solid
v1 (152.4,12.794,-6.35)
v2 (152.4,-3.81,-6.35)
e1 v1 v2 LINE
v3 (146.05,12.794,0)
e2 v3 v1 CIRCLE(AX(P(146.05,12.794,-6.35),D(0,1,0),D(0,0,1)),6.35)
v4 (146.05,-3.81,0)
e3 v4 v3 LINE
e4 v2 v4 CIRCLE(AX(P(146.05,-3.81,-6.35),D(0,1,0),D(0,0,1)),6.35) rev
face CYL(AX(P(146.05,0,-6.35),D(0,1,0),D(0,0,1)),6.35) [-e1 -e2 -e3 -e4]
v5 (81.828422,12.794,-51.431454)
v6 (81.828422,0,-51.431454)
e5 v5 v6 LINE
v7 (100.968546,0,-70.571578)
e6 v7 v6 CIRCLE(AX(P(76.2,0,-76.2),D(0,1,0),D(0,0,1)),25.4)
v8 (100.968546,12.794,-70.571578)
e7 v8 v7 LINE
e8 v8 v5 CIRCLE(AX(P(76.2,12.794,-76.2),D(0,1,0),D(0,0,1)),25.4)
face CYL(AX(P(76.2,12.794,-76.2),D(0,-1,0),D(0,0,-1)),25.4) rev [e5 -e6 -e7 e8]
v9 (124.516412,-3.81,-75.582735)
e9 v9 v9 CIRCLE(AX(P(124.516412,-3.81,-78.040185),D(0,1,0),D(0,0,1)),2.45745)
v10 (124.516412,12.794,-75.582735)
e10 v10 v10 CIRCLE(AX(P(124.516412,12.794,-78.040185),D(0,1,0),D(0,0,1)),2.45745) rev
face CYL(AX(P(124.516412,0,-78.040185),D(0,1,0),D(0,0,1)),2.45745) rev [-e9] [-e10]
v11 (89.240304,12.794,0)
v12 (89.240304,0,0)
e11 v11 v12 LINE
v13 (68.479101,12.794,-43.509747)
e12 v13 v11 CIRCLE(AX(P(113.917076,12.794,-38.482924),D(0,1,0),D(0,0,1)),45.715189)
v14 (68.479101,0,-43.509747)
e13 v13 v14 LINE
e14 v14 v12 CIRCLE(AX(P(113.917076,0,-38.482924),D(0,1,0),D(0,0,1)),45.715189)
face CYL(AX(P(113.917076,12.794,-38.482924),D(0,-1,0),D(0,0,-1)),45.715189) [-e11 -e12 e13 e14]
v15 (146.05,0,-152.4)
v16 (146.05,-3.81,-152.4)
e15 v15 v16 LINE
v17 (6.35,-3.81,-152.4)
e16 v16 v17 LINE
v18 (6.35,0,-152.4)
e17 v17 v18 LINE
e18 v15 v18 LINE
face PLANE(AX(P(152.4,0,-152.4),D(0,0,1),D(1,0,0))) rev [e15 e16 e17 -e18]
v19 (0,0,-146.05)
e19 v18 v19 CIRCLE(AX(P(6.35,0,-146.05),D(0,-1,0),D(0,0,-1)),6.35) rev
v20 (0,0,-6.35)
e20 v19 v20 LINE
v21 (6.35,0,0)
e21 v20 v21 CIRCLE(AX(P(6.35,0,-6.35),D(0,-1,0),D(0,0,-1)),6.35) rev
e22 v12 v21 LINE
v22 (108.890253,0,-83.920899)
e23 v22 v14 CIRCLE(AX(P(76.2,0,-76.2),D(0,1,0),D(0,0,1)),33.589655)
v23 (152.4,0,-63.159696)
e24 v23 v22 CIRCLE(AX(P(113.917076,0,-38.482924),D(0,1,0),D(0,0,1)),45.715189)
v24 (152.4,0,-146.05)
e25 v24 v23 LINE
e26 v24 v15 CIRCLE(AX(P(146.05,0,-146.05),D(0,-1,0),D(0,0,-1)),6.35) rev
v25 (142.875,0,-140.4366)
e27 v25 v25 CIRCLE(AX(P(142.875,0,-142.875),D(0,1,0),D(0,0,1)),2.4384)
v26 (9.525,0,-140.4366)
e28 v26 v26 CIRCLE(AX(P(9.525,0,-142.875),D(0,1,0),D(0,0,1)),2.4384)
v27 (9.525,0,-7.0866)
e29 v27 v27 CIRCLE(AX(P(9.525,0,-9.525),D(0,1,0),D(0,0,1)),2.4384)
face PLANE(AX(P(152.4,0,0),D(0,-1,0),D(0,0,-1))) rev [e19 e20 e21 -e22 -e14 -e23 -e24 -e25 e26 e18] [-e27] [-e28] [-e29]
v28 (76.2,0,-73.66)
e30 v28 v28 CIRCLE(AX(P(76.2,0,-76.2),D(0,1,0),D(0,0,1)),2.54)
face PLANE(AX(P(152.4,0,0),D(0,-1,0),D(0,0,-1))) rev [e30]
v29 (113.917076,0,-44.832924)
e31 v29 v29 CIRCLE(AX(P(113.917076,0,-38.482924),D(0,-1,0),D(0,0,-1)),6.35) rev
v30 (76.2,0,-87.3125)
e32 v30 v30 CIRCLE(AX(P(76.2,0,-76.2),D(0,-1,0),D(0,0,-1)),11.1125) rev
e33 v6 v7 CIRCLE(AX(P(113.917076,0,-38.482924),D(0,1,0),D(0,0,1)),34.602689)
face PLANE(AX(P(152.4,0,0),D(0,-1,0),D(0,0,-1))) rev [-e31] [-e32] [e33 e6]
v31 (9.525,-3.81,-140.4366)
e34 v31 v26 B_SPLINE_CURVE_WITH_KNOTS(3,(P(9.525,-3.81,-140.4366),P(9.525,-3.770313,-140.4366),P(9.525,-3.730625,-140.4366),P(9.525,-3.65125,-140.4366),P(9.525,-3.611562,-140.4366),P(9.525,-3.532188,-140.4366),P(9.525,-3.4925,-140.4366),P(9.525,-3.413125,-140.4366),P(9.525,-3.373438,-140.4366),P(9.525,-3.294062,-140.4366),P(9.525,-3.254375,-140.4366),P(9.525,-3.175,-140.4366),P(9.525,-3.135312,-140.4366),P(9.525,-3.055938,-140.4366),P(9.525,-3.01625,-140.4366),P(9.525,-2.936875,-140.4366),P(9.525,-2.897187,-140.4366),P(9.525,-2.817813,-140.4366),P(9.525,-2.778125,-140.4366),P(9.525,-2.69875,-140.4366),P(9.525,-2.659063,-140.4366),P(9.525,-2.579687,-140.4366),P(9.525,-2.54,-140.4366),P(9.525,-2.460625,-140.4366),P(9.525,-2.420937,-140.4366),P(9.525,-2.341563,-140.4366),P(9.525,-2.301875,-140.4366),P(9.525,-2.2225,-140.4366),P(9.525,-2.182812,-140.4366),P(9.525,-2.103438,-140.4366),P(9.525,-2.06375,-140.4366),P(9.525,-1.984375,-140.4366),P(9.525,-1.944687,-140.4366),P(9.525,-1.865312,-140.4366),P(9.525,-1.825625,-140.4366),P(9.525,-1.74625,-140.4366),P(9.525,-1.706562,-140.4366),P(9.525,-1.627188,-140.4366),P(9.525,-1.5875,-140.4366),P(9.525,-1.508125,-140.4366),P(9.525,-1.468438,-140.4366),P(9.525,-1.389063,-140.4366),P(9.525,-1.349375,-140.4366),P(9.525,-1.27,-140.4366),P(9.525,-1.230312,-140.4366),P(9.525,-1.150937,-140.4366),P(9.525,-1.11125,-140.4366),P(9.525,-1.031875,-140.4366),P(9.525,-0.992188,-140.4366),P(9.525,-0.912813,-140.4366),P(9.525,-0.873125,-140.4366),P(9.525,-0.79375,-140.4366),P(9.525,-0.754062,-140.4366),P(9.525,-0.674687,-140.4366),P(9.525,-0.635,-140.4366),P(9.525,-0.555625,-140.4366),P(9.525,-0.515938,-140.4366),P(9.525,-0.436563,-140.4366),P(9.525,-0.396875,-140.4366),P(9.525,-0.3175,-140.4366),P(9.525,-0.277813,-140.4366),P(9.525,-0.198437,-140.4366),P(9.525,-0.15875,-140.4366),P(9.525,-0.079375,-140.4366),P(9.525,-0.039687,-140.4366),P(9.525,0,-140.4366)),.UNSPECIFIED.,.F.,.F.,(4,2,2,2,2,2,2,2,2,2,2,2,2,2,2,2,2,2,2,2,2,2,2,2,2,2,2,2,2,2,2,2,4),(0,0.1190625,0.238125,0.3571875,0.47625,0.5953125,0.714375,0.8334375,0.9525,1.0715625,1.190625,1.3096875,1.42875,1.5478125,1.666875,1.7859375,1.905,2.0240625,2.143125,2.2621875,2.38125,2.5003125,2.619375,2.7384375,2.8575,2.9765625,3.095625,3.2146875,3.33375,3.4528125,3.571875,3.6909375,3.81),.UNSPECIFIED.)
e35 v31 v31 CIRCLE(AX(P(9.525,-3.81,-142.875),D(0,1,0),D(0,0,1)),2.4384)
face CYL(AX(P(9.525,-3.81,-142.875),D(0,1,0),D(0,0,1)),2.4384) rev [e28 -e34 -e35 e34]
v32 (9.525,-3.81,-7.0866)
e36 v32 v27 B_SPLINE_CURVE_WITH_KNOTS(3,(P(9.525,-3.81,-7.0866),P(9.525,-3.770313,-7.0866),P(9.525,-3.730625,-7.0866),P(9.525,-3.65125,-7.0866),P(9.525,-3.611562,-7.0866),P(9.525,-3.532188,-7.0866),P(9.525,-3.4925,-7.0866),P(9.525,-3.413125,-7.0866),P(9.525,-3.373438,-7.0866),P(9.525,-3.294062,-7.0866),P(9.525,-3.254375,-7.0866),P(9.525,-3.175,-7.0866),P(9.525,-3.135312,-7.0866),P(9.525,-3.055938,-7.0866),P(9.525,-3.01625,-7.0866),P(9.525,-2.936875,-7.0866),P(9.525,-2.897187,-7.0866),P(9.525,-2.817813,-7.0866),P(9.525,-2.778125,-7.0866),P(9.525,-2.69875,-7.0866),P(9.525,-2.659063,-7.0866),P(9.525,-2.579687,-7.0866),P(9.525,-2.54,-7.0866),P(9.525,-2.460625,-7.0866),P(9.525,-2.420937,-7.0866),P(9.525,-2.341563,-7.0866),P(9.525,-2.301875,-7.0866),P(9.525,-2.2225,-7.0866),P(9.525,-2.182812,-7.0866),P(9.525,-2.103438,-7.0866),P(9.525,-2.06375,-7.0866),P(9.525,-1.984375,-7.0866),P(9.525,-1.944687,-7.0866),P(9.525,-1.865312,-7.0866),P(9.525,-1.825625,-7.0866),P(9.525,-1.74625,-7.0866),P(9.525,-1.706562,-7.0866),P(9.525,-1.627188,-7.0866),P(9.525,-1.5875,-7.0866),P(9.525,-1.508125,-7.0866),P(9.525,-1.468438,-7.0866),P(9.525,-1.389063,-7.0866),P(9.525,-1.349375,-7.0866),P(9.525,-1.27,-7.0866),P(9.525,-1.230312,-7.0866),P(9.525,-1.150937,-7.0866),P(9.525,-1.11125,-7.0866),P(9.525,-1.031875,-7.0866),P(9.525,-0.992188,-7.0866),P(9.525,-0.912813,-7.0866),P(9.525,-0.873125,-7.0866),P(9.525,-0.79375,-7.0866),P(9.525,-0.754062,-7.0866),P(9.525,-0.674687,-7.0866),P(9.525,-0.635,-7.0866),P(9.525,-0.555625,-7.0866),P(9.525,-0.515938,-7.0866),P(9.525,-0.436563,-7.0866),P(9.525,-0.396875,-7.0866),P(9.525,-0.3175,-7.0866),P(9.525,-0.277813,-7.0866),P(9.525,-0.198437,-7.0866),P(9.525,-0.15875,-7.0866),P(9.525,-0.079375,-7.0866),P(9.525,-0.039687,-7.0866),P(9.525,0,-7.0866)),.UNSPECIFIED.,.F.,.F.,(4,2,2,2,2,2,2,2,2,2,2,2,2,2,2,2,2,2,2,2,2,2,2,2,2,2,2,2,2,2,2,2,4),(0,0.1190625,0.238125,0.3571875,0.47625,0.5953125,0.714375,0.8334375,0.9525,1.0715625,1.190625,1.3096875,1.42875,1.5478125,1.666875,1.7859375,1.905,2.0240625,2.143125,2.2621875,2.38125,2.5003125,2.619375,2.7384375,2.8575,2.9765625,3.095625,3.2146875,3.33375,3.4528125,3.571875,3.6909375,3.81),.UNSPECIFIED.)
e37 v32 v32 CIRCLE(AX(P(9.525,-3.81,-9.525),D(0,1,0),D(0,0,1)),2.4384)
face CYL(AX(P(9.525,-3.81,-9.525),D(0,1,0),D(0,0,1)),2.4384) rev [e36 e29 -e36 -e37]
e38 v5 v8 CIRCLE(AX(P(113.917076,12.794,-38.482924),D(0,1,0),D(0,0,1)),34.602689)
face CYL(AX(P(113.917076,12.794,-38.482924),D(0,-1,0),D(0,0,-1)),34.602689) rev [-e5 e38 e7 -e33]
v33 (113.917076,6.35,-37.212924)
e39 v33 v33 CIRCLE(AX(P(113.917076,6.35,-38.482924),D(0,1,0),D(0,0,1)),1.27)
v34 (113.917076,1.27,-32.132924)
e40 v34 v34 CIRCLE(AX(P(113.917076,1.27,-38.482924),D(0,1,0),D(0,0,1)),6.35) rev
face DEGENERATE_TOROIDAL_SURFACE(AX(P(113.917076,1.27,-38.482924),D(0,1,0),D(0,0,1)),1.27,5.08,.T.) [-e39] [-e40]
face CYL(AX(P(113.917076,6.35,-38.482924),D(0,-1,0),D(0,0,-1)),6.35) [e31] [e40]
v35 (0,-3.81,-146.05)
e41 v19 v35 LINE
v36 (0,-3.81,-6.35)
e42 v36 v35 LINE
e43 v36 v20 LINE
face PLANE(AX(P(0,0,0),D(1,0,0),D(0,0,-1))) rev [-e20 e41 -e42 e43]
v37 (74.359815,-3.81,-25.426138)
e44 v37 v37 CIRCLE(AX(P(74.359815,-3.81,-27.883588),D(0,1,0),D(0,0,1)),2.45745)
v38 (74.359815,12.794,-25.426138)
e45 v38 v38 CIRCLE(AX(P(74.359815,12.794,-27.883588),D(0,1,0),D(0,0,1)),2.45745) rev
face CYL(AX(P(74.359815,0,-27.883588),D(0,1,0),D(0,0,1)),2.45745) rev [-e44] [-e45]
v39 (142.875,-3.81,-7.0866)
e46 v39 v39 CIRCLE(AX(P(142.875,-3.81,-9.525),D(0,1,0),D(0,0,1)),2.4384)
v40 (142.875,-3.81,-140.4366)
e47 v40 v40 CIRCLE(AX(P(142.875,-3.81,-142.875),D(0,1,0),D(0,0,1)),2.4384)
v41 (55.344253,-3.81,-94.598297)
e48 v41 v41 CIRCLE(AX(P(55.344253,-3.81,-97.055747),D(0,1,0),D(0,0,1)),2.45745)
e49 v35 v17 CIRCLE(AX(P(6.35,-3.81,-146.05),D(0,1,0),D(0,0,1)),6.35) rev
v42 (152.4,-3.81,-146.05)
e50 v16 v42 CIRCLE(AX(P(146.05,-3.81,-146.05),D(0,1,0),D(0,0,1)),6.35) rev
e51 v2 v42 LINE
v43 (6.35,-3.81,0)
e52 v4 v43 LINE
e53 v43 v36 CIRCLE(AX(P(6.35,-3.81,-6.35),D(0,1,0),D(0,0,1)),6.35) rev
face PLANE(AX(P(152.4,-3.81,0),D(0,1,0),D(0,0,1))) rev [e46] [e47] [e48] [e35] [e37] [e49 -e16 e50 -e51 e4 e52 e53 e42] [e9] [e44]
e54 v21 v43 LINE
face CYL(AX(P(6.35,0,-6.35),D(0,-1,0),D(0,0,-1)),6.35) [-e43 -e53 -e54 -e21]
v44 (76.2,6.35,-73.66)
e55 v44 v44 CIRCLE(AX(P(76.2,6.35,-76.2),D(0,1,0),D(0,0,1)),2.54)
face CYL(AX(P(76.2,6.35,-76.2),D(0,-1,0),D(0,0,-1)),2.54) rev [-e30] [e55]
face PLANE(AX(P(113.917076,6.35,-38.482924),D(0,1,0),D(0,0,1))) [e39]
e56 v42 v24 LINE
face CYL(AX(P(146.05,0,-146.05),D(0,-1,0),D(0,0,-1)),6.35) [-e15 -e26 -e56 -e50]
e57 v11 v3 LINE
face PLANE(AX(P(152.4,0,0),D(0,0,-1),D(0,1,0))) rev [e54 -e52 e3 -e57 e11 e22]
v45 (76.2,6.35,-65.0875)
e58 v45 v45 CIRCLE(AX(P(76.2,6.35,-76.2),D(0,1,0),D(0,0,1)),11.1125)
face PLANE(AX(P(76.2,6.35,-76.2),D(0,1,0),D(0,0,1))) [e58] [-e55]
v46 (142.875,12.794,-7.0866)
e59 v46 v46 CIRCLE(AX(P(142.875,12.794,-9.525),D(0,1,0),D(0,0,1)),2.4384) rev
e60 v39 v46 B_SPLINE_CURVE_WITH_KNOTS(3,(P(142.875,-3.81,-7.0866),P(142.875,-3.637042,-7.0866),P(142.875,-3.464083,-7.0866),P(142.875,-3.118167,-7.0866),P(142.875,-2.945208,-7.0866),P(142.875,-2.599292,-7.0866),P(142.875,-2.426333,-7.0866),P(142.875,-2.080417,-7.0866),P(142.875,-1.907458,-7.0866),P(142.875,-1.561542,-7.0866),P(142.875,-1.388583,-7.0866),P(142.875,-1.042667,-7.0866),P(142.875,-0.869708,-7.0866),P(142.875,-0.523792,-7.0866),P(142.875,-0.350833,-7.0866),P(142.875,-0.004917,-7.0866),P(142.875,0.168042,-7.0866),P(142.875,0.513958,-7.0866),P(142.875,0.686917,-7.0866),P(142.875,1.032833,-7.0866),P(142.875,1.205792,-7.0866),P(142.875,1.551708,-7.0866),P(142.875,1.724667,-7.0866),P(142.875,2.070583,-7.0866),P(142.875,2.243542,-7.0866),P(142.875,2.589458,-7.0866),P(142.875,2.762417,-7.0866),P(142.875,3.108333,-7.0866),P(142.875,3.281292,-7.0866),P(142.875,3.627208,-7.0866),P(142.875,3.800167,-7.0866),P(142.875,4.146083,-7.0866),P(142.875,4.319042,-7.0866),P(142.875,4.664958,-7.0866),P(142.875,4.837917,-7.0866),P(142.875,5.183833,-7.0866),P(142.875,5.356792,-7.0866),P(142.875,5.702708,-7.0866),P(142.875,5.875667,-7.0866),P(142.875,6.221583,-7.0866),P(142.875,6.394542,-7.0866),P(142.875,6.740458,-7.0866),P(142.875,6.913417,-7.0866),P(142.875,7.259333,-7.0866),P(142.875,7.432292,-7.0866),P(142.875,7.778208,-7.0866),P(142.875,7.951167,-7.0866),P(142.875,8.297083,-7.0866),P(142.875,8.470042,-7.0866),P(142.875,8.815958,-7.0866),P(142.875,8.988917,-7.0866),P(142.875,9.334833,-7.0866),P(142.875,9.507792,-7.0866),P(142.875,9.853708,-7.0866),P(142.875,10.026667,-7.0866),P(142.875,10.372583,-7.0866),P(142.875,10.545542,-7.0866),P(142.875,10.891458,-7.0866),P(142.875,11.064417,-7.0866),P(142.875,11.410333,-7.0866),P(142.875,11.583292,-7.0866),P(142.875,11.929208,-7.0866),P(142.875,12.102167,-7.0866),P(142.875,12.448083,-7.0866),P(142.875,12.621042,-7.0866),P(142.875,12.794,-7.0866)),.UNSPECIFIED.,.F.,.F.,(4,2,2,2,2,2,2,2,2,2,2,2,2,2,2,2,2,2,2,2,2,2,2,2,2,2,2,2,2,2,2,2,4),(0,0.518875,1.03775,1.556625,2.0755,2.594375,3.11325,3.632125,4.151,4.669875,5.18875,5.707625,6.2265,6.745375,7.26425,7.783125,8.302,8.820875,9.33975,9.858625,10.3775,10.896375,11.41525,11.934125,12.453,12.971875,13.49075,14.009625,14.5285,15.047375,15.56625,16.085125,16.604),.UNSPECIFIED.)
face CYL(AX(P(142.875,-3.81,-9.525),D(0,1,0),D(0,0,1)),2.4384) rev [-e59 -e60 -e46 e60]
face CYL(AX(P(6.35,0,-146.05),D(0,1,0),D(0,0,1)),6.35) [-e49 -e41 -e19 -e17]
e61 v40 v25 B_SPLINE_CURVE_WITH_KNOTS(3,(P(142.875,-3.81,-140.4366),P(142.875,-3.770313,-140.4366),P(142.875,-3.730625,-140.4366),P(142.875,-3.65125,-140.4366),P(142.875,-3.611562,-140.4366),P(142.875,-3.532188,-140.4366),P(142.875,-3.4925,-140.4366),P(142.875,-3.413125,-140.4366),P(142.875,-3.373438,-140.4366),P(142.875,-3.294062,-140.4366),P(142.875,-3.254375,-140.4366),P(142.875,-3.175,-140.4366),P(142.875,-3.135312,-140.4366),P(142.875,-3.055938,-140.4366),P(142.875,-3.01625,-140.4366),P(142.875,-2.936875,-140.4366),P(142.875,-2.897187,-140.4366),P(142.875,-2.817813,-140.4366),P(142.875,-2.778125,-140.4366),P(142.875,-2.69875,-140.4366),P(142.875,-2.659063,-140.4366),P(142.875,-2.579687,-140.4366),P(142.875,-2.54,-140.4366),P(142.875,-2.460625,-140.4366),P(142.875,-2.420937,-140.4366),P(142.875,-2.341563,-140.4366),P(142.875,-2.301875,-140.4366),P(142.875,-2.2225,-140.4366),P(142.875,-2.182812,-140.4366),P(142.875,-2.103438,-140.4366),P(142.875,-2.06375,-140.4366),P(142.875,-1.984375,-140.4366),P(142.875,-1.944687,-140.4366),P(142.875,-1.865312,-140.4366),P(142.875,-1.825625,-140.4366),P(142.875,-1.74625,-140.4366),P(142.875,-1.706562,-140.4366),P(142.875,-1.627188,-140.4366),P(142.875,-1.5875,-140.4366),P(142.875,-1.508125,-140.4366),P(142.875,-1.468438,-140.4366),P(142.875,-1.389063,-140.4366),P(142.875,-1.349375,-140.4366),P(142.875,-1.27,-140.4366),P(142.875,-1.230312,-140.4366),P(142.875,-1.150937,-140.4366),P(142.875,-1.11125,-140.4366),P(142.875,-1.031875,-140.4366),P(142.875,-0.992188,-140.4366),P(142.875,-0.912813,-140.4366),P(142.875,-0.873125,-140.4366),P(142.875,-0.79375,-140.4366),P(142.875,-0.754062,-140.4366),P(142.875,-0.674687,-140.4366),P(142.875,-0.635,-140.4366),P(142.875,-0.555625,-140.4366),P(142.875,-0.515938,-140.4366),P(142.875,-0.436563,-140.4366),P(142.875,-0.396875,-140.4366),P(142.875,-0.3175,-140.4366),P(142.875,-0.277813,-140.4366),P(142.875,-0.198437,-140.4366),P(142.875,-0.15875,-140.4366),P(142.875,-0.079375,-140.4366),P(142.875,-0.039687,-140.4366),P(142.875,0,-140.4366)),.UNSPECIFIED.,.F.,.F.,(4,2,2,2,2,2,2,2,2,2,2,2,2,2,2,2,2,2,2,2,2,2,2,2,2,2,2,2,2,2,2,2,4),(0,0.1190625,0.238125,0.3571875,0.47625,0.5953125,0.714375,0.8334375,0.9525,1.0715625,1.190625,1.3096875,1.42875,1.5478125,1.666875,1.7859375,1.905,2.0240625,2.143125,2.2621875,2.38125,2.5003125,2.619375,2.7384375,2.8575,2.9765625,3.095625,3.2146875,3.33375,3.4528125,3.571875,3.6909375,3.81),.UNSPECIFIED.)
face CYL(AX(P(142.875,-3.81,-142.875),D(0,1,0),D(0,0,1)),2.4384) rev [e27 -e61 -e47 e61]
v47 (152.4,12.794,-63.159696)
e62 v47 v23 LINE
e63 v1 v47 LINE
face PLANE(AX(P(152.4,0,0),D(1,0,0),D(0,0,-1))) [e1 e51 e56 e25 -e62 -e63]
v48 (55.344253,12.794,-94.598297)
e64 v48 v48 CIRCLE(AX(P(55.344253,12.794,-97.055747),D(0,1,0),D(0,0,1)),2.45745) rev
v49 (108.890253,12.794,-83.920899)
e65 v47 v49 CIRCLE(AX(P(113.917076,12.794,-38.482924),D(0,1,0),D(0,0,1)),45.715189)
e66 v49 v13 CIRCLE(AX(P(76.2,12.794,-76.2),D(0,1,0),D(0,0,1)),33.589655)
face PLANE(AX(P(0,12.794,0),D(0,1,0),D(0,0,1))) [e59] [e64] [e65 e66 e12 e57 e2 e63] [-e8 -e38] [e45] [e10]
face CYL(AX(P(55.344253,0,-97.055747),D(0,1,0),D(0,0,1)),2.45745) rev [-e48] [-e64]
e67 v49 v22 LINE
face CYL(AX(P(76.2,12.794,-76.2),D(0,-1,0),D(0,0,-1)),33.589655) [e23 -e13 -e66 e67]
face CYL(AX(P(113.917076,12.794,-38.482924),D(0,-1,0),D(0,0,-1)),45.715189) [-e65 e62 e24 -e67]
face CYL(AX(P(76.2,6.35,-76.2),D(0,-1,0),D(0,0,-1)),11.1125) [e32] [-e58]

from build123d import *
from build123d.topology import SkipClean

# Parameters (mm, degrees)
SKETCH1_W                    = 152.4
SKETCH1_H                    = 3.81
MAIN_FRAME_DEPTH             = 152.4
FILLET1_R                    = 6.35
SKETCH3_R                    = 6.35
POT_GEAR_SNUB_NUB_DEPTH      = 6.35
SKETCH3_6_R                  = 11.1125
SKETCH3_6_R_2                = 2.54
BASE_SNUB_NUB_DEPTH          = 6.35
SKETCH7_R                    = 2.4384
CORNER_MOUNTING_HOLES_DEPTH  = 216.619670949
FILLET2_R                    = 5.08
F_10_0_1935_DIAMETER_HOLE1_D = 4.9149
BOSS_EXTRUDE2_OUTLINE_R      = 2.45745
BOSS_EXTRUDE2_OUTLINE_R_2    = 2.4384
BOSS_EXTRUDE2_DEPTH          = 12.794


# Read off the part's stored shape, not the designer's step: Boss-Extrude2
with BuildPart() as part:
    # Sketch1 → Main Frame (new body)
    with BuildSketch(Plane(origin=(0, 0, 0), x_dir=(0, 0, -1), z_dir=(1, 0, 0))):
        with Locations((76.2, -1.905)):
            Rectangle(SKETCH1_W, SKETCH1_H)
    extrude(amount=MAIN_FRAME_DEPTH)

    # Fillet1
    fillet1_edges = [part.edges().sort_by_distance(p)[0] for p in [
        (152.4, -1.905, -152.4),
        (152.4, -1.905, 0),
        (0, -1.905, -152.4),
        (0, -1.905, 0),
    ]]
    fillet(fillet1_edges, radius=FILLET1_R)

    # Sketch3 → Pot Gear Snub Nub (add)
    with BuildSketch(Plane(origin=(0, 0, 0), x_dir=(1, 0, 0), z_dir=(0, 1, 0))):
        with Locations(Location((113.917075708, 38.482924292, 0), (0, 0, 90))):
            Circle(SKETCH3_R)
    extrude(amount=POT_GEAR_SNUB_NUB_DEPTH)

    # Sketch3<6> → Base Snub Nub (add)
    with BuildSketch(Plane(origin=(0, 0, 0), x_dir=(1, 0, 0), z_dir=(0, 1, 0))):
        with Locations(Location((76.2, 76.2, 0), (0, 0, 90))):
            Circle(SKETCH3_6_R)
        with Locations(Location((76.2, 76.2, 0), (0, 0, 270))):
            Circle(SKETCH3_6_R_2, mode=Mode.SUBTRACT)
    extrude(amount=BASE_SNUB_NUB_DEPTH)

    # Sketch7 → Corner Mounting Holes (cut, through all)
    with BuildSketch(Plane(origin=(0, 0, 0), x_dir=(1, 0, 0), z_dir=(0, 1, 0))):
        with Locations(Location((142.875, 142.875, 0), (0, 0, 270))):
            Circle(SKETCH7_R)
        with Locations(Location((142.875, 9.525, 0), (0, 0, 270))):
            Circle(SKETCH7_R)
        with Locations(Location((9.525, 9.525, 0), (0, 0, 270))):
            Circle(SKETCH7_R)
        with Locations(Location((9.525, 142.875, 0), (0, 0, 270))):
            Circle(SKETCH7_R)
    extrude(amount=-CORNER_MOUNTING_HOLES_DEPTH, mode=Mode.SUBTRACT)

    # Fillet2
    fillet2_edges = [part.edges().sort_by_distance(p)[0] for p in [
        (113.917075708, 6.35, -32.132924292),
    ]]
    fillet(fillet2_edges, radius=FILLET2_R)

    # #10 (0.1935) Diameter Hole1 (through all)
    with Locations(Plane(origin=(0, 0, 0), x_dir=(1, 0, 0), z_dir=(0, 1, 0))):
        with Locations((124.51641164, 78.040184515), (74.359815485, 27.88358836), (55.344253184, 97.055746816)):
            Hole(F_10_0_1935_DIAMETER_HOLE1_D / 2)

    # Boss-Extrude2 outline → Boss-Extrude2 (add)
    with SkipClean():  # the faces are left unmerged after this step: merging them gives an invalid solid
        with BuildSketch(Plane(origin=(0, 0, 0), x_dir=(1, 0, 0), z_dir=(0, 1, 0))):
            with BuildLine():
                ThreePointArc((108.890253115, 83.92089943), (52.448527028, 99.951472972), (68.47910057, 43.509746885))
                ThreePointArc((68.47910057, 43.509746885), (72.658210549, 18.795756494), (89.240303876, 0))
                Line((89.240303876, 0), (146.05, 0))
                ThreePointArc((146.05, 0), (150.540128061, 1.859871939), (152.4, 6.35))
                Line((152.4, 6.35), (152.4, 63.159696124))
                ThreePointArc((152.4, 63.159696124), (133.604243506, 79.741789451), (108.890253115, 83.92089943))
            make_face()
            with Locations((74.359815485, 27.88358836)):
                Circle(BOSS_EXTRUDE2_OUTLINE_R, mode=Mode.SUBTRACT)
            with Locations((142.875, 9.525)):
                Circle(BOSS_EXTRUDE2_OUTLINE_R_2, mode=Mode.SUBTRACT)
            with BuildLine():
                ThreePointArc((81.82842228, 51.431454168), (58.239487758, 94.160512242), (100.968545832, 70.57157772))
                ThreePointArc((100.968545832, 70.57157772), (138.384871939, 14.015128061), (81.82842228, 51.431454168))
            make_face(mode=Mode.SUBTRACT)
            with Locations((55.344253184, 97.055746816)):
                Circle(BOSS_EXTRUDE2_OUTLINE_R, mode=Mode.SUBTRACT)
            with Locations((124.51641164, 78.040184515)):
                Circle(BOSS_EXTRUDE2_OUTLINE_R, mode=Mode.SUBTRACT)
        extrude(amount=BOSS_EXTRUDE2_DEPTH)


solid = part.part
